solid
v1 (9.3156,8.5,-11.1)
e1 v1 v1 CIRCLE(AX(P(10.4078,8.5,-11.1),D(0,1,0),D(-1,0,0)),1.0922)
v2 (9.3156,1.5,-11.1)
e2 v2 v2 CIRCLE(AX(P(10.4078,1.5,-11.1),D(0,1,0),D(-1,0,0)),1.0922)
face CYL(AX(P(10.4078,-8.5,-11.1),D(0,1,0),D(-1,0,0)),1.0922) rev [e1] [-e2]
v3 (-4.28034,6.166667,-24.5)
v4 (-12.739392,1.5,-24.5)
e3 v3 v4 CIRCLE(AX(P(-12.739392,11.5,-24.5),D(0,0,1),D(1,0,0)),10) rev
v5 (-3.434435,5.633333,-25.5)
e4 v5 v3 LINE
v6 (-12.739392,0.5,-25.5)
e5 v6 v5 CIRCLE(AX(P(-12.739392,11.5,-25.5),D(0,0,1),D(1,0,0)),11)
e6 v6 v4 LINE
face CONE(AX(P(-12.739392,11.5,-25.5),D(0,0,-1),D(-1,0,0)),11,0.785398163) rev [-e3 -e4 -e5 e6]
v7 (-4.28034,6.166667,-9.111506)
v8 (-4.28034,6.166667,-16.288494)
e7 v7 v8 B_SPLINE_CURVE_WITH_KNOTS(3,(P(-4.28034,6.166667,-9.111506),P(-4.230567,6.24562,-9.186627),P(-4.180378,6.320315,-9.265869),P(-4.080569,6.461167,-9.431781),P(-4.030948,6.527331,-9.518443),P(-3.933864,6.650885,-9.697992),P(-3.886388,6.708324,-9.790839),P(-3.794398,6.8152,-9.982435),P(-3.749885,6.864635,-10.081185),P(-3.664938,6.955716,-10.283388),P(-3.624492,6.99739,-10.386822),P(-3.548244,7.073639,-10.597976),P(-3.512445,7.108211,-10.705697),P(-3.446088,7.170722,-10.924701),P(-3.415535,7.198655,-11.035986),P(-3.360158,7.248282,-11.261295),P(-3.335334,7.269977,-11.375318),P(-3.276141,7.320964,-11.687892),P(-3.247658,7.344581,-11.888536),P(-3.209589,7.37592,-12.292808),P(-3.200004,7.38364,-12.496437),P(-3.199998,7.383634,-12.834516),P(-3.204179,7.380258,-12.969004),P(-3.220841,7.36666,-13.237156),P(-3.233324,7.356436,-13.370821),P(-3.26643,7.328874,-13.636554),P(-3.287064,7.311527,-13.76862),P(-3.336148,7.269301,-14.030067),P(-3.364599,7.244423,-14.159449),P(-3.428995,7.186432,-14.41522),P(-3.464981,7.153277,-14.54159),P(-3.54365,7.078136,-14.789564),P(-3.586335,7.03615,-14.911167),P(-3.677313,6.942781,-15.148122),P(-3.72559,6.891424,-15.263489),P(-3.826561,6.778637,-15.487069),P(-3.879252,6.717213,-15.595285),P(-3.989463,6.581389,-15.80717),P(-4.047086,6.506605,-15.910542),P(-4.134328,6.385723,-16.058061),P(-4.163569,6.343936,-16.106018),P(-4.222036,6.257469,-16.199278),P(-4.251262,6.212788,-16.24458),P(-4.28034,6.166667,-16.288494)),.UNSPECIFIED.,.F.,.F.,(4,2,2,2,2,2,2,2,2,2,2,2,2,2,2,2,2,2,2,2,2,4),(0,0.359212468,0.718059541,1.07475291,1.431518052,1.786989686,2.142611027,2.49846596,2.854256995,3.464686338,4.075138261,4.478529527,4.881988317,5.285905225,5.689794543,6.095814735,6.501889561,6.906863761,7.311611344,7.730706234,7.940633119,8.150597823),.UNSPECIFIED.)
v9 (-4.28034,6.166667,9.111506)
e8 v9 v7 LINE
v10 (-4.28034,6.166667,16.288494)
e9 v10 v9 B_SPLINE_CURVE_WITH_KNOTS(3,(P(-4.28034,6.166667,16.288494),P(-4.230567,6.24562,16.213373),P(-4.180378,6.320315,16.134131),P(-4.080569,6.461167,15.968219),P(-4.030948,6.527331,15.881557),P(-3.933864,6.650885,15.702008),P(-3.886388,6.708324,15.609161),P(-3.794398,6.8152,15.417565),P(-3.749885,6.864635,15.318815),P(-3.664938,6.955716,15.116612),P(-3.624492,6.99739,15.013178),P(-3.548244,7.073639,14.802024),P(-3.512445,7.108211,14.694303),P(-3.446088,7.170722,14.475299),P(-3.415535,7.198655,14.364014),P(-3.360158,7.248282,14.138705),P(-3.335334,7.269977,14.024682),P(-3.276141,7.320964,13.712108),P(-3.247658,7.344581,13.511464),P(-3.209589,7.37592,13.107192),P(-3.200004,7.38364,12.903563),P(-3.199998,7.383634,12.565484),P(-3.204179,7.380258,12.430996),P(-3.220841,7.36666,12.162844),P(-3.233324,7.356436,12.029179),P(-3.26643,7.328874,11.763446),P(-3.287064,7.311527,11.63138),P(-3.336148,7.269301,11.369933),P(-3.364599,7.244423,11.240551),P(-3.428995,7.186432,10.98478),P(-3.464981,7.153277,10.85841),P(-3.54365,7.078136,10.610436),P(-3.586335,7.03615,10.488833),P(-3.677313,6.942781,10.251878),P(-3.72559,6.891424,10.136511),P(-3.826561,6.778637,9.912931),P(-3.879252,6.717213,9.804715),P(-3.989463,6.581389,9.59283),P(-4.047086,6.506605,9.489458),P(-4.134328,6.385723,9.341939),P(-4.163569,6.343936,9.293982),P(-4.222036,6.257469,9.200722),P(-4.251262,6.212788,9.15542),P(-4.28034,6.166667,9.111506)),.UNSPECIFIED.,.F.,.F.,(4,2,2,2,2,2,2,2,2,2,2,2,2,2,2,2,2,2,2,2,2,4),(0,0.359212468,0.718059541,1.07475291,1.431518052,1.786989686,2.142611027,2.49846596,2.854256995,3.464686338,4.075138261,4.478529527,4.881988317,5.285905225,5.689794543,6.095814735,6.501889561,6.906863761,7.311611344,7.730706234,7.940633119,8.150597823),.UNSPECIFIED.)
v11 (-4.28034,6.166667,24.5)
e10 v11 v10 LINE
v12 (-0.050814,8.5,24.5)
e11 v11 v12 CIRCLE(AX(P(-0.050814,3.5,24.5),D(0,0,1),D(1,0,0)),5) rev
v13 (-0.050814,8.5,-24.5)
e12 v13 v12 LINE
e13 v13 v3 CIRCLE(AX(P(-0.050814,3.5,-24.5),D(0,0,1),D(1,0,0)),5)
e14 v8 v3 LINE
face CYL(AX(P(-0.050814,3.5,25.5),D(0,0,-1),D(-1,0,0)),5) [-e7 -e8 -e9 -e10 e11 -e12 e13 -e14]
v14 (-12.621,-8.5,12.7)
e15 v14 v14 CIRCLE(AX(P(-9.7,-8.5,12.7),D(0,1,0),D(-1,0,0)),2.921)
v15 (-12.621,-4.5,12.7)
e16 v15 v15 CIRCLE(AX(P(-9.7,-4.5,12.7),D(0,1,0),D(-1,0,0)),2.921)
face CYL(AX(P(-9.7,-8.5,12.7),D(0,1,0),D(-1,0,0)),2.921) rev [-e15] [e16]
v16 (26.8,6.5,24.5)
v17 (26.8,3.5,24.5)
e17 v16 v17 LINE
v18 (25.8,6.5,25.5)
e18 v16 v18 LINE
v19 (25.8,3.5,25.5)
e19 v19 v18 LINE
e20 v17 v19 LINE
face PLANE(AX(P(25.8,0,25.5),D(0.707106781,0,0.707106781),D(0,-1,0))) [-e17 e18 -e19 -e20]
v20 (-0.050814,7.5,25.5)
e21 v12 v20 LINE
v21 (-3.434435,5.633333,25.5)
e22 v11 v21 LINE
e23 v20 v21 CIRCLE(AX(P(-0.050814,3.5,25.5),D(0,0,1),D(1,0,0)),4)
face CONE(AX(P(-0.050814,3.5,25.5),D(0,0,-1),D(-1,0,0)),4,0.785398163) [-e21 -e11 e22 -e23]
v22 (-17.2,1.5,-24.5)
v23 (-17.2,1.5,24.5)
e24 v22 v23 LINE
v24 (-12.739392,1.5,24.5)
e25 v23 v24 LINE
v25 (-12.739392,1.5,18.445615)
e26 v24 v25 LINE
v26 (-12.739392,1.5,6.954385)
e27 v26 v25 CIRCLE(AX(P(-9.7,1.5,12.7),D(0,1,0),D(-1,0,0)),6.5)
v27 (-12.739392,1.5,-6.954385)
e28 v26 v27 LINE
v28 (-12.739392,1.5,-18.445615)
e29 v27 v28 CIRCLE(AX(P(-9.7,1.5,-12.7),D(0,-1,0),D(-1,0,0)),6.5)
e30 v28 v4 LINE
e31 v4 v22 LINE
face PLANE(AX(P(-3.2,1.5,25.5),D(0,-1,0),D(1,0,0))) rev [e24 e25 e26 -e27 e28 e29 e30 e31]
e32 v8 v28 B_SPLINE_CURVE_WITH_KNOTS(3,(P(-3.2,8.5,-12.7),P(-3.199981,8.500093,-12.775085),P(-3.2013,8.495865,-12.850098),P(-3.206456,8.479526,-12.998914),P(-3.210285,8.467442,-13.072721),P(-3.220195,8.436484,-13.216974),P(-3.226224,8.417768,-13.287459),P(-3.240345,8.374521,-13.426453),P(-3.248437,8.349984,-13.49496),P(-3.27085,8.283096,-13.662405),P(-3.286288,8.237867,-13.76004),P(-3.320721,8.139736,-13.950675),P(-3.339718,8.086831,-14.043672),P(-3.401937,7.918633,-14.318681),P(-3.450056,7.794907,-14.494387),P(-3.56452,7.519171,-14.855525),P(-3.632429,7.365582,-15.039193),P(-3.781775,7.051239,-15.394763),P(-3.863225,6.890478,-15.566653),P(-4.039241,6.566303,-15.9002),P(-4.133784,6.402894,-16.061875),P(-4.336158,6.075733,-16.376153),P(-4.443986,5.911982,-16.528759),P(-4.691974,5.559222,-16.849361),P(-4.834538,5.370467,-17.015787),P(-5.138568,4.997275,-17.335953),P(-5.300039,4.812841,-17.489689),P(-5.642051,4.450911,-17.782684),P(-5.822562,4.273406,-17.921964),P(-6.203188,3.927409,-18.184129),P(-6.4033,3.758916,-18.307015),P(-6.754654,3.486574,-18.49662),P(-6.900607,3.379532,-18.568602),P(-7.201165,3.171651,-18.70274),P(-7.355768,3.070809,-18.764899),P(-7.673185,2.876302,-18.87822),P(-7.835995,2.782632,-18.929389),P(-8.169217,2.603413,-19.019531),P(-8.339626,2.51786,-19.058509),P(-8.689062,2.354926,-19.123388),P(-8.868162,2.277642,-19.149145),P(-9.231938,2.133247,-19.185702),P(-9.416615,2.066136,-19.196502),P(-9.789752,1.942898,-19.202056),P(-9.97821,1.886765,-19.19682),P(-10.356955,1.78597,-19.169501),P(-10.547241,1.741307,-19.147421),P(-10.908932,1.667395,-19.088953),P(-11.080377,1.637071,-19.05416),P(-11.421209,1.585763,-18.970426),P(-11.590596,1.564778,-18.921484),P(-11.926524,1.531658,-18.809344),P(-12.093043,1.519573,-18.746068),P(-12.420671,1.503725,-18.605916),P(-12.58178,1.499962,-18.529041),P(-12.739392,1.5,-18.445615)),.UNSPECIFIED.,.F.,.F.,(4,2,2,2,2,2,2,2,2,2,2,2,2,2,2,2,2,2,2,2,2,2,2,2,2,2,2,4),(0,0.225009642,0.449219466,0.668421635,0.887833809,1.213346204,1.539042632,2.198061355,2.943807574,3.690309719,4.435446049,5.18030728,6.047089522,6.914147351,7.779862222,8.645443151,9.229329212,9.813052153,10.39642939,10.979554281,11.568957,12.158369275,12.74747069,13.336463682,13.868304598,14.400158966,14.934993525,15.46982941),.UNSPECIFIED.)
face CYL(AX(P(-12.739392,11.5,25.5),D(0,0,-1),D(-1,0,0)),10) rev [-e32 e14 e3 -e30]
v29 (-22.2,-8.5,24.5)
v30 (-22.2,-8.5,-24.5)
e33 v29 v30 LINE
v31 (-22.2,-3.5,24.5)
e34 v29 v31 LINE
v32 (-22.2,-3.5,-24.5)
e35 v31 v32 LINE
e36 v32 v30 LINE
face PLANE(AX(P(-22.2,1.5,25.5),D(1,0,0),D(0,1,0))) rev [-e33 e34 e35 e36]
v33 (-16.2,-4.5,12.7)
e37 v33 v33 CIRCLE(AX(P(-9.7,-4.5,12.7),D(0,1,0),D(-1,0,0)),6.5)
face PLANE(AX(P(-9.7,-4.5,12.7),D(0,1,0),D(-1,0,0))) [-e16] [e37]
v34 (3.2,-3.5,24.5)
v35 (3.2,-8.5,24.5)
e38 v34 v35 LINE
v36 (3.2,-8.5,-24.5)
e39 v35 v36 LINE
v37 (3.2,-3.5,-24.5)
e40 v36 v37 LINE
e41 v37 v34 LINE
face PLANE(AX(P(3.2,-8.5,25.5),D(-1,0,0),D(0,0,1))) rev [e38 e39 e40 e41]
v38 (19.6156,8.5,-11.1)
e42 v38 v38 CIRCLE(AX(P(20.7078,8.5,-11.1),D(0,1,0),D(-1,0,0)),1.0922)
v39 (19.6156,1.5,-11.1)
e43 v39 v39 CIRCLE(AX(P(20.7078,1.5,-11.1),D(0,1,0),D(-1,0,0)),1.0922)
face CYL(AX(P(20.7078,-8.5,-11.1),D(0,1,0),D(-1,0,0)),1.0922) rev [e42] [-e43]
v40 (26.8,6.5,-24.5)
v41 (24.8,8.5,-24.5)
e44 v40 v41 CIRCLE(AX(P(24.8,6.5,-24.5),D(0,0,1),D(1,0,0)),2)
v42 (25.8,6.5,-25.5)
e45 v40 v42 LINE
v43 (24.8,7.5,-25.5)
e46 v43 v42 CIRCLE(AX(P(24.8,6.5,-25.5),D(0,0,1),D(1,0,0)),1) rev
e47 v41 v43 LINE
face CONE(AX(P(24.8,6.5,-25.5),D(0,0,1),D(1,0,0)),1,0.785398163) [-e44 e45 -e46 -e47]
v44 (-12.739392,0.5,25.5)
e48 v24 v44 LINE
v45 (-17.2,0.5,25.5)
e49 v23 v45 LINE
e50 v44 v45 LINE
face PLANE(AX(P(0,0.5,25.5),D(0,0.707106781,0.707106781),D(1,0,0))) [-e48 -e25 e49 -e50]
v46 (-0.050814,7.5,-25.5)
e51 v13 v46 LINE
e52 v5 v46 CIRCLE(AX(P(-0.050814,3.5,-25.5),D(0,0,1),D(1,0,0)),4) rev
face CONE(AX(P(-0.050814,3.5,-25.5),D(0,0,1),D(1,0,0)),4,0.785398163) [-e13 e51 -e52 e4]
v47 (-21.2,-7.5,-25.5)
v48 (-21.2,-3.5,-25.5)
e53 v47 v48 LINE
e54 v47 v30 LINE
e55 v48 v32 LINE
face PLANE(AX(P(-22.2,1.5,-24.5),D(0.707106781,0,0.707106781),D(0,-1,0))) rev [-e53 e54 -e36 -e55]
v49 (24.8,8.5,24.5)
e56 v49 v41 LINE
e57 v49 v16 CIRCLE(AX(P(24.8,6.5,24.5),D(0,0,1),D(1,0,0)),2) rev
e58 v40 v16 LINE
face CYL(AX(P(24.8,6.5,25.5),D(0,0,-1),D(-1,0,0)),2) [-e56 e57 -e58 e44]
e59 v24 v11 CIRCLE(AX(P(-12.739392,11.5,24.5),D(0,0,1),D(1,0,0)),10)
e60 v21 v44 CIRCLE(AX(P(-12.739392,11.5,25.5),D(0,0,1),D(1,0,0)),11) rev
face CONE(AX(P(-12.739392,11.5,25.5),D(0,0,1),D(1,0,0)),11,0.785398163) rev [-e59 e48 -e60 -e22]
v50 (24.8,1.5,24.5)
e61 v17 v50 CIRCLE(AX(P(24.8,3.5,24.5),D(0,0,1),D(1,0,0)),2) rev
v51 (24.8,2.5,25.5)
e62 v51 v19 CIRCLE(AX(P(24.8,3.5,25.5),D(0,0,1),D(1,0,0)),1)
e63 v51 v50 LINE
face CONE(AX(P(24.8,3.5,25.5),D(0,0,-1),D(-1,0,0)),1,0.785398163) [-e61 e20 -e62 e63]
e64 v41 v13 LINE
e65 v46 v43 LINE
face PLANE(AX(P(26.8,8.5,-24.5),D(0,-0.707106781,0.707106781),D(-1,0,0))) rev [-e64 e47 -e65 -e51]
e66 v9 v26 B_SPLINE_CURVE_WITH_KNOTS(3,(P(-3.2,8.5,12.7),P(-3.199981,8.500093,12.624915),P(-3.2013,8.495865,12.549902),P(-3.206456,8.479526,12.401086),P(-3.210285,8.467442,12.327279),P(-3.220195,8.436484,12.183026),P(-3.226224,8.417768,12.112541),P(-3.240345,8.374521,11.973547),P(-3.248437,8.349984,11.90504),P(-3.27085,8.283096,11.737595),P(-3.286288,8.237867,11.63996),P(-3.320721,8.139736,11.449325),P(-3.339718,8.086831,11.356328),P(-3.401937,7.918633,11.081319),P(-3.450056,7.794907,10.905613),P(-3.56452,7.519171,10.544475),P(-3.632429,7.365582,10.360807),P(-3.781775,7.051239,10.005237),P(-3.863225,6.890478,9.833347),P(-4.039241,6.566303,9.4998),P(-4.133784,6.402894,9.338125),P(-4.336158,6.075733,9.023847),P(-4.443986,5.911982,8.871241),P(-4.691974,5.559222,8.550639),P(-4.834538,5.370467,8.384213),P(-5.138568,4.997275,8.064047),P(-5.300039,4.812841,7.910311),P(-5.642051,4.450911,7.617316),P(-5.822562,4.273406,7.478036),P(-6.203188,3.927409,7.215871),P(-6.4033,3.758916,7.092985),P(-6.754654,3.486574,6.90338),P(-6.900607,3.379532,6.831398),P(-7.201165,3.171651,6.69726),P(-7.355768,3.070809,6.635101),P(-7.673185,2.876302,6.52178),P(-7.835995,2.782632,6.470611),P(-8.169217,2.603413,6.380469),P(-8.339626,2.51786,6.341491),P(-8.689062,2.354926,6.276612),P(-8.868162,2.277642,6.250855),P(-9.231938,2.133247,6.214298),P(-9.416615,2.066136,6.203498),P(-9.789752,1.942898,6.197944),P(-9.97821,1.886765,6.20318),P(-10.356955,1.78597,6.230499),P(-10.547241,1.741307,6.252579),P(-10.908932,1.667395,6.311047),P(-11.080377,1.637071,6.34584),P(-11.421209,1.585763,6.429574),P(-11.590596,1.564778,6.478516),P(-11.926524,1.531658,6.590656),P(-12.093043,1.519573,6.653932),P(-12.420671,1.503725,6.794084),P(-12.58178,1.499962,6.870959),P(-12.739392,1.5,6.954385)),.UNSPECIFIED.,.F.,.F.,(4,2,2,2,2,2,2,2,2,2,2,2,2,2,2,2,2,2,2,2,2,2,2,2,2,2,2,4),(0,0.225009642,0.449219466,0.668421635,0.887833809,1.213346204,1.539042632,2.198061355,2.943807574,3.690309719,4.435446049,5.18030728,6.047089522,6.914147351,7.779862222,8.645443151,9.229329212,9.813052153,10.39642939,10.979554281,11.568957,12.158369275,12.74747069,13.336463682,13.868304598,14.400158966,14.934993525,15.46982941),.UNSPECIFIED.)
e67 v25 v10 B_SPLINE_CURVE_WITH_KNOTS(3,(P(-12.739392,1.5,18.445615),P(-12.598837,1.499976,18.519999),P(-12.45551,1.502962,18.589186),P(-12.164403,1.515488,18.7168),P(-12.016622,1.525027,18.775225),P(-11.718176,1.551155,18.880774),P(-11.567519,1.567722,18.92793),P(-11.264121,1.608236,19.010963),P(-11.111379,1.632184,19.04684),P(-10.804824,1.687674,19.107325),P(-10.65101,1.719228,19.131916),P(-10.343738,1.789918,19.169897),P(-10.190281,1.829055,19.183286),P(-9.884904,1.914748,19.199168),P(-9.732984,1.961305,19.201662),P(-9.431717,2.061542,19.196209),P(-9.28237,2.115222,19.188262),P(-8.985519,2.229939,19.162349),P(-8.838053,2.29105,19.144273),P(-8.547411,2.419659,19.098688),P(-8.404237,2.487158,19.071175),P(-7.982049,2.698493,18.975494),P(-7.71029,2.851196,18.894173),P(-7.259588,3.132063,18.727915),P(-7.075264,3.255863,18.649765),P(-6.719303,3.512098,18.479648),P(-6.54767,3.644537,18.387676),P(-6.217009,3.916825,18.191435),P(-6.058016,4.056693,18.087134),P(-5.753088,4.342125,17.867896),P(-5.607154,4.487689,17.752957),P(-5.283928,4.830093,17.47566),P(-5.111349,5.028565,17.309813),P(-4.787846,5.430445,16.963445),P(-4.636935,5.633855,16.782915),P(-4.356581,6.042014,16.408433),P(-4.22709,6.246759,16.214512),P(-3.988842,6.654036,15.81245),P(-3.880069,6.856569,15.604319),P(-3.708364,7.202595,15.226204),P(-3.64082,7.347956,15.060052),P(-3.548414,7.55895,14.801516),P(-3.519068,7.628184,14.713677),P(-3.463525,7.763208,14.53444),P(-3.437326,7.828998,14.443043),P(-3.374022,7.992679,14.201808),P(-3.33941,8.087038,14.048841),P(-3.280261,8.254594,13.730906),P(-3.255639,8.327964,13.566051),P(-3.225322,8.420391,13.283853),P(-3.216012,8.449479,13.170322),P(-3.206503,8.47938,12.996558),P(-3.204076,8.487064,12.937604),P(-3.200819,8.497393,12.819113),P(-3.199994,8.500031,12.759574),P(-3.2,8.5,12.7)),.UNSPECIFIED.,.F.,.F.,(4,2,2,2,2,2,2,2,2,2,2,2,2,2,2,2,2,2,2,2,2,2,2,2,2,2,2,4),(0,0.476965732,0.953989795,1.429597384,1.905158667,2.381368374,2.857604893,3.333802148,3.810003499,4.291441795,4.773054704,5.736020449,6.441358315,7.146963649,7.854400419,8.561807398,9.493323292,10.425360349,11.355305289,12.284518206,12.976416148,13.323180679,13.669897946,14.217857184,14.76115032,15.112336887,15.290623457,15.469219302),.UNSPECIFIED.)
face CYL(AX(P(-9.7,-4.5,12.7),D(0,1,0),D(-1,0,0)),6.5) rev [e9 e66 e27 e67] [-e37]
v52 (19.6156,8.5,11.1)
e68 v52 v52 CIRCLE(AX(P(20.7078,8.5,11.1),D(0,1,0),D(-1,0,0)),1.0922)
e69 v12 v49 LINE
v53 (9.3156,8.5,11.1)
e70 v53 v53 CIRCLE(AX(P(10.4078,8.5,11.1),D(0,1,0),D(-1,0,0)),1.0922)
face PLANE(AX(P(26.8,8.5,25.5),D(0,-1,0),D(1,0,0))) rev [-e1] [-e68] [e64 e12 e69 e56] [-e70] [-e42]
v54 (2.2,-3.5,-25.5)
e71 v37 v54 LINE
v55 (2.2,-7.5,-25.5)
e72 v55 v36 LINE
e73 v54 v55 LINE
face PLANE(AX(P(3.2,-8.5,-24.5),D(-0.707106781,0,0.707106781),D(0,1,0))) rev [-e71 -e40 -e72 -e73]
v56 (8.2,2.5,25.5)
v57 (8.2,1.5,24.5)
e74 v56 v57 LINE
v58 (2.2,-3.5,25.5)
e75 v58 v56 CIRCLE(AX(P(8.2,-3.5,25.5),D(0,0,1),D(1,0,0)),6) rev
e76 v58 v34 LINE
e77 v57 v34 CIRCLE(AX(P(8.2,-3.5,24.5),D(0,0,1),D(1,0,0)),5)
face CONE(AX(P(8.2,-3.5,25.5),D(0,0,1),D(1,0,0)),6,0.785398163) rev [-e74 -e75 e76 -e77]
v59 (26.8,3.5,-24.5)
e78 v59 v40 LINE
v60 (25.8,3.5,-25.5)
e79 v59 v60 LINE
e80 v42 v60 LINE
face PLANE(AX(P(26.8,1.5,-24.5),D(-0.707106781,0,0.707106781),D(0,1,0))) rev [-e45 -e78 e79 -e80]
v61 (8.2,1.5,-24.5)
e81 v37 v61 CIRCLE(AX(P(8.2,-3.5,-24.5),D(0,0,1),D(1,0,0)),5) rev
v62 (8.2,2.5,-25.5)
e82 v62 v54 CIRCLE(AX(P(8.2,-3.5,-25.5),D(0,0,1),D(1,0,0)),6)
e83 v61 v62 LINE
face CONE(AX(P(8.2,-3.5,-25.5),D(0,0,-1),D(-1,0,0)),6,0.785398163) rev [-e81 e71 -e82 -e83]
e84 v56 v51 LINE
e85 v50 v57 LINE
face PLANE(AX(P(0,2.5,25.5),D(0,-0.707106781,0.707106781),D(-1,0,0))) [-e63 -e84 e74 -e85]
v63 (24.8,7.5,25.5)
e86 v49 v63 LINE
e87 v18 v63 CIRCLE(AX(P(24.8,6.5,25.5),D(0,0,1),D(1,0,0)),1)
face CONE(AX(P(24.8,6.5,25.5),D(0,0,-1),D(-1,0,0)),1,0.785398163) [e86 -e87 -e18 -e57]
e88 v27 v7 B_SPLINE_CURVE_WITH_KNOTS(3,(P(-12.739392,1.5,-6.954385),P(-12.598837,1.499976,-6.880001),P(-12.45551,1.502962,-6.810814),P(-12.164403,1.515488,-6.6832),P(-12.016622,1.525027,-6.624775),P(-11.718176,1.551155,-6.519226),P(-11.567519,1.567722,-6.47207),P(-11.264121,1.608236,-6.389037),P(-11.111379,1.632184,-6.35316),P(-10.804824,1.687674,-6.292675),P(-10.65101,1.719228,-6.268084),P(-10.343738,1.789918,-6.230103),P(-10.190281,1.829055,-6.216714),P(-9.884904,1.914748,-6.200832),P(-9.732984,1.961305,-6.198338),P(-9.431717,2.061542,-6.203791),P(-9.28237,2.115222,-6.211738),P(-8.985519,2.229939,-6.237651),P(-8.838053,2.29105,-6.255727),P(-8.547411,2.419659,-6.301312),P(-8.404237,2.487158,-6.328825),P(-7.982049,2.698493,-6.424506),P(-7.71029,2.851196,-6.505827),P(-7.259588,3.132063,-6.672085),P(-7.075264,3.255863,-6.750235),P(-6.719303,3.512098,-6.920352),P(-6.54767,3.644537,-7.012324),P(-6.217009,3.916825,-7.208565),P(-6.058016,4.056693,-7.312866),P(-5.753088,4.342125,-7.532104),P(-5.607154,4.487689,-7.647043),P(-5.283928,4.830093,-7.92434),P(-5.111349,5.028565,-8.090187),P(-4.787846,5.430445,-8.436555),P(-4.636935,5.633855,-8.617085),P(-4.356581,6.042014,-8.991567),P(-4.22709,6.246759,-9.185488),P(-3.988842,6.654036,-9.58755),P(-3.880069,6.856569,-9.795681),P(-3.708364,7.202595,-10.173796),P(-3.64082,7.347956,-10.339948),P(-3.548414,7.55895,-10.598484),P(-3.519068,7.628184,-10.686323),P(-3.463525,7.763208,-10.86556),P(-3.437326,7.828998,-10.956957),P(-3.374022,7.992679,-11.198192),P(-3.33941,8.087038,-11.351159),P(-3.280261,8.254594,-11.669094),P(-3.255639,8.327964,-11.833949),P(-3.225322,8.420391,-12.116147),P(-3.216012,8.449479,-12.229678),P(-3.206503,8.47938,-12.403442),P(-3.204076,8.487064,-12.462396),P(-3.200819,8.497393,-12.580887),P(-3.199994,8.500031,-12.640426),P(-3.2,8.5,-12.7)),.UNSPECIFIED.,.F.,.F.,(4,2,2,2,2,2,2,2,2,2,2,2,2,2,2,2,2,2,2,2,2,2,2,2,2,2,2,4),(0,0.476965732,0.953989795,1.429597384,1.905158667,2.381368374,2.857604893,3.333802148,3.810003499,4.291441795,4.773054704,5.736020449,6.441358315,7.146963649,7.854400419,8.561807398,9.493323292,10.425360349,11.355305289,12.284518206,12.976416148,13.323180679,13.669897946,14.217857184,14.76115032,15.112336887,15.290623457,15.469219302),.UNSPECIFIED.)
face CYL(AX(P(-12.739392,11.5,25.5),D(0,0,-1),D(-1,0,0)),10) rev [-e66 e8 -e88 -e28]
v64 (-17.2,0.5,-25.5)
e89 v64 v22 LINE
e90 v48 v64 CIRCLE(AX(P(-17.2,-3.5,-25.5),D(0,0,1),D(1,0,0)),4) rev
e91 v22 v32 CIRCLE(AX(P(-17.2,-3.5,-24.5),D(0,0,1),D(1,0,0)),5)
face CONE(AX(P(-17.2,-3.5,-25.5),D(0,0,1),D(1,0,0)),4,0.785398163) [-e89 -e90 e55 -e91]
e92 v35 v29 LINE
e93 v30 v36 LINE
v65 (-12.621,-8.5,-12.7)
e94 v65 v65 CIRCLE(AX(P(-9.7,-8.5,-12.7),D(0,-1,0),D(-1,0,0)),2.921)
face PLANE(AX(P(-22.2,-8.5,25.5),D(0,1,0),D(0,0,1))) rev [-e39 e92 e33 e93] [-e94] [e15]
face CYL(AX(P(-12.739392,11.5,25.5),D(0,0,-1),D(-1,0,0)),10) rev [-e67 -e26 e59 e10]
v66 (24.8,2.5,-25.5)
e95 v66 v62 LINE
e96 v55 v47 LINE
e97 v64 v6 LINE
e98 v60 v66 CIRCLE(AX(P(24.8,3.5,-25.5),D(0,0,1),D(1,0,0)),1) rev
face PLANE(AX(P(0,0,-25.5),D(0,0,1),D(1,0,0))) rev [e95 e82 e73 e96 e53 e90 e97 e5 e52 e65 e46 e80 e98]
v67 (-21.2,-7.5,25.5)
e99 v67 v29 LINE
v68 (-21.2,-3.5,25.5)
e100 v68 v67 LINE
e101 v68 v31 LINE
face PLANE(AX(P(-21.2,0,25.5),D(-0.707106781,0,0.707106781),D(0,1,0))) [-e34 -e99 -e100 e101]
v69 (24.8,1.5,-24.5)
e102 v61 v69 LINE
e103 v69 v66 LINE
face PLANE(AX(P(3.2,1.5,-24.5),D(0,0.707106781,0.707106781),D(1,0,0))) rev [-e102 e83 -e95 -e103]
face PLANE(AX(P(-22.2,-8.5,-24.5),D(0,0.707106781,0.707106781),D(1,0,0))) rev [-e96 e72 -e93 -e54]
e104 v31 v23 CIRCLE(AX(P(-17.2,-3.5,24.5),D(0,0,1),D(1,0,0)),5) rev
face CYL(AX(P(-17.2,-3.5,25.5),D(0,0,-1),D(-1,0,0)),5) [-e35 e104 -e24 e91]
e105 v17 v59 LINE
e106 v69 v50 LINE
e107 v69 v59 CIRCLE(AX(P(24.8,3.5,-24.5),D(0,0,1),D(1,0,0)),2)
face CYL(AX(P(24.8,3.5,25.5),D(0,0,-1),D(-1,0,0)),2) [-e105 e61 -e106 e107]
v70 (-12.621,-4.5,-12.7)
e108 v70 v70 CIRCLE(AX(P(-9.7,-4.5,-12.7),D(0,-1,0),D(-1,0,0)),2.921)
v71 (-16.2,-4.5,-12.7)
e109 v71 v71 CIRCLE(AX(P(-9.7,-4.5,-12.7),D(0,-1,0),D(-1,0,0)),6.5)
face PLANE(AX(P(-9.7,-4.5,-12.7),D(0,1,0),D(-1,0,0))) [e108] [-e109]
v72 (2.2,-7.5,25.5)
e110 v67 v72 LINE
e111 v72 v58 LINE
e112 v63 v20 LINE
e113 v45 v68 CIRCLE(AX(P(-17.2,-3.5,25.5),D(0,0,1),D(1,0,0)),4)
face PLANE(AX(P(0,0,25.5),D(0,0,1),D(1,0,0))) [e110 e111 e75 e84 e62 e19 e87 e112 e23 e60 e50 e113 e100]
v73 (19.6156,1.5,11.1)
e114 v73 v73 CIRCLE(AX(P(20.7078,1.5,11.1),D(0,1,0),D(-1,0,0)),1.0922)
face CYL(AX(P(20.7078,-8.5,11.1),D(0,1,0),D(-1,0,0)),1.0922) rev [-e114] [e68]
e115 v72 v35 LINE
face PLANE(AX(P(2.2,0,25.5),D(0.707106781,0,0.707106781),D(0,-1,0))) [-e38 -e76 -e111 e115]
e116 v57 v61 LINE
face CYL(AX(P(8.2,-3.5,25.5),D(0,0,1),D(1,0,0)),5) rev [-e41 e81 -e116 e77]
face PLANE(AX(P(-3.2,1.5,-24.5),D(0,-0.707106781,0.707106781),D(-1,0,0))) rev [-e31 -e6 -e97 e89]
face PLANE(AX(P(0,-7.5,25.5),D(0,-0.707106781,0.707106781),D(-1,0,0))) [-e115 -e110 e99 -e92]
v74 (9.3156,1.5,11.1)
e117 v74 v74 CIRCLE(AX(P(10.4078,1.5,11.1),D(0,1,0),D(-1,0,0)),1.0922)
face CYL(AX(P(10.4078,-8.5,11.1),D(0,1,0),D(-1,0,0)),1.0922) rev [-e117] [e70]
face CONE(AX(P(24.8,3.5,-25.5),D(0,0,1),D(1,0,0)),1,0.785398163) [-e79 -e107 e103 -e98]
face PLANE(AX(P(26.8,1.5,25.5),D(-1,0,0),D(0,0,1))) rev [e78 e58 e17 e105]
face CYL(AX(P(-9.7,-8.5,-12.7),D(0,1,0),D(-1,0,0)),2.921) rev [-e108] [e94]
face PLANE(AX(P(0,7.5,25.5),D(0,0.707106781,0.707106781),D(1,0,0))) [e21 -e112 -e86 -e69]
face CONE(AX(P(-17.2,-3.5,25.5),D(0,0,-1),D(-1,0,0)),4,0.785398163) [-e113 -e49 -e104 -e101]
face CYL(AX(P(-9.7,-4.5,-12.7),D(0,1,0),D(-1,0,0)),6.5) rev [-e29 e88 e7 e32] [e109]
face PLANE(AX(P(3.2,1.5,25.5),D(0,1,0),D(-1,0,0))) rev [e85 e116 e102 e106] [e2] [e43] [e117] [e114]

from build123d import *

# Parameters (mm, degrees)
BOSS_EXTRUDE1_DEPTH = 25.5
SKETCH3_R           = 2.921
CUT_EXTRUDE1_DEPTH  = 39.320882036
SKETCH3_4_R         = 6.5
SKETCH3_4_R_2       = 2.921
CUT_EXTRUDE2_DEPTH  = 6
SKETCH9_R           = 1.0922
CUT_EXTRUDE3_DEPTH  = 41.712283159
FILLET1_R           = 10
FILLET2_R           = 5
FILLET4_R           = 2
CHAMFER1_SIZE       = 1


with BuildPart() as part:
    # Sketch1 → Boss-Extrude1 (new, symmetric)
    with BuildSketch(Plane.XY):
        Polygon((-22.2, -8.5), (3.2, -8.5), (3.2, 1.5), (26.8, 1.5), (26.8, 8.5), (-3.2, 8.5), (-3.2, 1.5), (-22.2, 1.5), align=None)
    extrude(amount=BOSS_EXTRUDE1_DEPTH, both=True)

    # Sketch3 → Cut-Extrude1 (cut, through all)
    with BuildSketch(Plane(origin=(0, 1.5, 0), x_dir=(1, 0, 0), z_dir=(0, 1, 0))):
        with Locations(Location((-9.7, -12.7, 0), (0, 0, 180))):
            Circle(SKETCH3_R)
    cut_extrude1 = extrude(amount=-CUT_EXTRUDE1_DEPTH, mode=Mode.SUBTRACT)

    # Sketch3<4> → Cut-Extrude2 (cut)
    with BuildSketch(Plane(origin=(0, 1.5, 0), x_dir=(1, 0, 0), z_dir=(0, 1, 0))):
        with Locations(Location((-9.7, -12.7, 0), (0, 0, 180))):
            Circle(SKETCH3_4_R)
        with Locations(Location((-9.7, -12.7, 0), (0, 0, 180))):
            Circle(SKETCH3_4_R_2, mode=Mode.SUBTRACT)
    cut_extrude2 = extrude(amount=-CUT_EXTRUDE2_DEPTH, mode=Mode.SUBTRACT)

    # Mirror1: Cut-Extrude1, Cut-Extrude2 across plane
    add(cut_extrude1.mirror(Plane.XY), mode=Mode.SUBTRACT)
    add(cut_extrude2.mirror(Plane.XY), mode=Mode.SUBTRACT)

    # Sketch9 → Cut-Extrude3 (cut, through all)
    with BuildSketch(Plane(origin=(0, 8.5, 0), x_dir=(1, 0, 0), z_dir=(0, 1, 0))):
        with Locations(Location((10.4078, 11.1, 0), (0, 0, 180))):
            Circle(SKETCH9_R)
        with Locations(Location((20.7078, -11.1, 0), (0, 0, 180))):
            Circle(SKETCH9_R)
        with Locations(Location((20.7078, 11.1, 0), (0, 0, 180))):
            Circle(SKETCH9_R)
        with Locations(Location((10.4078, -11.1, 0), (0, 0, 180))):
            Circle(SKETCH9_R)
    extrude(amount=-CUT_EXTRUDE3_DEPTH, mode=Mode.SUBTRACT)

    # Fillet1
    # the kernel refuses this fillet: 10 mm, written as the material it adds along each edge
    with BuildSketch(Plane(origin=(-3.2, 1.5, 25.5), x_dir=(0, 1, 0), z_dir=(0, 0, -1))) as fillet1_piece_1_section:
        with BuildLine():
            CenterArc((10, -9.539392014), FILLET1_R, 107.457603124, 72.542396876)
            Line((0, -9.539392014), (0, 0))
            Line((0, 0), (7, 0))
        make_face()
    fillet1_piece_1 = extrude(amount=12.8, mode=Mode.PRIVATE)
    fillet1_piece_1 = fillet1_piece_1 - Plane(origin=(-9.7, 1.5, 12.7), x_dir=(-1, 0, 0), z_dir=(0, 1, 0)) * Cylinder(6.5, 64, mode=Mode.PRIVATE)
    add(fillet1_piece_1)
    with BuildSketch(Plane(origin=(-3.2, 1.5, -12.700000035), x_dir=(0, 1, 0), z_dir=(0, 0, -1))) as fillet1_piece_2_section:
        with BuildLine():
            CenterArc((10, -9.539392014), FILLET1_R, 107.457603124, 72.542396876)
            Line((0, -9.539392014), (0, 0))
            Line((0, 0), (7, 0))
        make_face()
    fillet1_piece_2 = extrude(amount=12.799999965, mode=Mode.PRIVATE)
    fillet1_piece_2 = fillet1_piece_2 - Plane(origin=(-9.7, 1.5, -12.7), x_dir=(-1, 0, 0), z_dir=(0, 1, 0)) * Cylinder(6.5, 64, mode=Mode.PRIVATE)
    add(fillet1_piece_2)
    with BuildSketch(Plane(origin=(-3.2, 1.5, 12.7), x_dir=(0, 1, 0), z_dir=(0, 0, -1))) as fillet1_piece_3_section:
        with BuildLine():
            CenterArc((10, -9.539392014), FILLET1_R, 107.457603124, 72.542396876)
            Line((0, -9.539392014), (0, 0))
            Line((0, 0), (7, 0))
        make_face()
    fillet1_piece_3 = extrude(amount=25.400000035, mode=Mode.PRIVATE)
    fillet1_piece_3 = fillet1_piece_3 - Plane(origin=(-9.7, 1.5, -12.7), x_dir=(-1, 0, 0), z_dir=(0, 1, 0)) * Cylinder(6.5, 89, mode=Mode.PRIVATE)
    fillet1_piece_3 = fillet1_piece_3 - Plane(origin=(-9.7, 1.5, 12.7), x_dir=(-1, 0, 0), z_dir=(0, 1, 0)) * Cylinder(6.5, 89, mode=Mode.PRIVATE)
    add(fillet1_piece_3)

    # Fillet2
    # the kernel refuses this fillet: 5 mm, written as the material it adds along each edge
    with BuildSketch(Plane(origin=(3.2, 1.5, -25.5), x_dir=(0, -1, 0), z_dir=(0, 0, 1))) as fillet2_piece_1:
        with BuildLine():
            CenterArc((FILLET2_R, FILLET2_R), FILLET2_R, 180, 90)
            Line((0, FILLET2_R), (0, 0))
            Line((0, 0), (FILLET2_R, 0))
        make_face()
    extrude(amount=51)
    # the kernel refuses this fillet: 5 mm, written as the material it takes off along each edge
    with BuildSketch(Plane(origin=(-3.2, 8.5, -33.372963816), x_dir=(1, 0, 0), z_dir=(0, 0, 1))) as fillet2_2_piece_1:
        with BuildLine():
            CenterArc((3.149185526, -5), FILLET2_R, 90, 57.769047364)
            ThreePointArc((-1.080340321, -2.333333333), (-0.464861443, -1.201534828), (0, 0))
            Line((0, 0), (3.149185526, 0))
        make_face()
    extrude(amount=20.67296378, mode=Mode.SUBTRACT)
    with BuildSketch(Plane(origin=(-22.2, 1.5, 38), x_dir=(1, 0, 0), z_dir=(0, 0, -1))) as fillet2_2_piece_2:
        with BuildLine():
            CenterArc((FILLET2_R, FILLET2_R), FILLET2_R, 180, 90)
            Line((0, FILLET2_R), (0, 0))
            Line((0, 0), (FILLET2_R, 0))
        make_face()
    extrude(amount=76, mode=Mode.SUBTRACT)
    with BuildSketch(Plane(origin=(-3.2, 8.5, -12.700000035), x_dir=(-0.42015348282673015, -0.9074530571156663, 0), z_dir=(0, 0, 1))) as fillet2_2_piece_3:
        with BuildLine():
            CenterArc((3.214124019, 4.958505447), FILLET2_R, 204.84427788, 57.769047364)
            Line((-1.323141267, 2.857738033), (0, 0))
            ThreePointArc((0, 0), (1.285649607, 0.082989105), (2.571299215, 0))
        make_face()
    extrude(amount=25.400000035, mode=Mode.SUBTRACT)
    with BuildSketch(Plane(origin=(-3.2, 8.5, 12.7), x_dir=(1, 0, 0), z_dir=(0, 0, 1))) as fillet2_2_piece_4:
        with BuildLine():
            CenterArc((3.149185526, -5), FILLET2_R, 90, 57.769047364)
            ThreePointArc((-1.080340321, -2.333333333), (-0.464861443, -1.201534828), (0, 0))
            Line((0, 0), (3.149185526, 0))
        make_face()
    extrude(amount=20.672963816, mode=Mode.SUBTRACT)

    # Fillet4
    fillet4_edges = [part.edges().sort_by_distance(p)[0] for p in [
        (26.8, 8.5, 0),
        (26.8, 1.5, 0),
    ]]
    fillet(fillet4_edges, radius=FILLET4_R)

    # Chamfer1
    chamfer1_edges = [part.edges().sort_by_distance(p)[0] for p in [
        (3.2, -6, -25.5),
        (12.374592763, 8.5, 25.5),
        (-9.5, -8.5, -25.5),
        (12.374592763, 8.5, -25.5),
        (26.8, 5, -25.5),
        (26.214213562, 2.085786438, -25.5),
        (26.214213562, 7.914213562, -25.5),
        (26.8, 5, 25.5),
        (26.214213562, 2.085786438, 25.5),
        (26.214213562, 7.914213562, 25.5),
        (3.2, -6, 25.5),
        (-14.969696007, 1.5, -25.5),
        (-14.969696007, 1.5, 25.5),
        (-7.908933099, 2.744049642, -25.5),
        (-7.908933099, 2.744049642, 25.5),
        (-22.2, -6, 25.5),
        (16.5, 1.5, 25.5),
        (-20.735533906, 0.035533906, 25.5),
        (-2.466043931, 7.877975179, 25.5),
        (-22.2, -6, -25.5),
        (-9.5, -8.5, 25.5),
        (16.5, 1.5, -25.5),
        (-20.735533906, 0.035533906, -25.5),
        (-2.466043931, 7.877975179, -25.5),
        (4.664466094, 0.035533906, -25.5),
        (4.664466094, 0.035533906, 25.5),
    ]]
    chamfer(chamfer1_edges, length=CHAMFER1_SIZE)


solid = part.part
